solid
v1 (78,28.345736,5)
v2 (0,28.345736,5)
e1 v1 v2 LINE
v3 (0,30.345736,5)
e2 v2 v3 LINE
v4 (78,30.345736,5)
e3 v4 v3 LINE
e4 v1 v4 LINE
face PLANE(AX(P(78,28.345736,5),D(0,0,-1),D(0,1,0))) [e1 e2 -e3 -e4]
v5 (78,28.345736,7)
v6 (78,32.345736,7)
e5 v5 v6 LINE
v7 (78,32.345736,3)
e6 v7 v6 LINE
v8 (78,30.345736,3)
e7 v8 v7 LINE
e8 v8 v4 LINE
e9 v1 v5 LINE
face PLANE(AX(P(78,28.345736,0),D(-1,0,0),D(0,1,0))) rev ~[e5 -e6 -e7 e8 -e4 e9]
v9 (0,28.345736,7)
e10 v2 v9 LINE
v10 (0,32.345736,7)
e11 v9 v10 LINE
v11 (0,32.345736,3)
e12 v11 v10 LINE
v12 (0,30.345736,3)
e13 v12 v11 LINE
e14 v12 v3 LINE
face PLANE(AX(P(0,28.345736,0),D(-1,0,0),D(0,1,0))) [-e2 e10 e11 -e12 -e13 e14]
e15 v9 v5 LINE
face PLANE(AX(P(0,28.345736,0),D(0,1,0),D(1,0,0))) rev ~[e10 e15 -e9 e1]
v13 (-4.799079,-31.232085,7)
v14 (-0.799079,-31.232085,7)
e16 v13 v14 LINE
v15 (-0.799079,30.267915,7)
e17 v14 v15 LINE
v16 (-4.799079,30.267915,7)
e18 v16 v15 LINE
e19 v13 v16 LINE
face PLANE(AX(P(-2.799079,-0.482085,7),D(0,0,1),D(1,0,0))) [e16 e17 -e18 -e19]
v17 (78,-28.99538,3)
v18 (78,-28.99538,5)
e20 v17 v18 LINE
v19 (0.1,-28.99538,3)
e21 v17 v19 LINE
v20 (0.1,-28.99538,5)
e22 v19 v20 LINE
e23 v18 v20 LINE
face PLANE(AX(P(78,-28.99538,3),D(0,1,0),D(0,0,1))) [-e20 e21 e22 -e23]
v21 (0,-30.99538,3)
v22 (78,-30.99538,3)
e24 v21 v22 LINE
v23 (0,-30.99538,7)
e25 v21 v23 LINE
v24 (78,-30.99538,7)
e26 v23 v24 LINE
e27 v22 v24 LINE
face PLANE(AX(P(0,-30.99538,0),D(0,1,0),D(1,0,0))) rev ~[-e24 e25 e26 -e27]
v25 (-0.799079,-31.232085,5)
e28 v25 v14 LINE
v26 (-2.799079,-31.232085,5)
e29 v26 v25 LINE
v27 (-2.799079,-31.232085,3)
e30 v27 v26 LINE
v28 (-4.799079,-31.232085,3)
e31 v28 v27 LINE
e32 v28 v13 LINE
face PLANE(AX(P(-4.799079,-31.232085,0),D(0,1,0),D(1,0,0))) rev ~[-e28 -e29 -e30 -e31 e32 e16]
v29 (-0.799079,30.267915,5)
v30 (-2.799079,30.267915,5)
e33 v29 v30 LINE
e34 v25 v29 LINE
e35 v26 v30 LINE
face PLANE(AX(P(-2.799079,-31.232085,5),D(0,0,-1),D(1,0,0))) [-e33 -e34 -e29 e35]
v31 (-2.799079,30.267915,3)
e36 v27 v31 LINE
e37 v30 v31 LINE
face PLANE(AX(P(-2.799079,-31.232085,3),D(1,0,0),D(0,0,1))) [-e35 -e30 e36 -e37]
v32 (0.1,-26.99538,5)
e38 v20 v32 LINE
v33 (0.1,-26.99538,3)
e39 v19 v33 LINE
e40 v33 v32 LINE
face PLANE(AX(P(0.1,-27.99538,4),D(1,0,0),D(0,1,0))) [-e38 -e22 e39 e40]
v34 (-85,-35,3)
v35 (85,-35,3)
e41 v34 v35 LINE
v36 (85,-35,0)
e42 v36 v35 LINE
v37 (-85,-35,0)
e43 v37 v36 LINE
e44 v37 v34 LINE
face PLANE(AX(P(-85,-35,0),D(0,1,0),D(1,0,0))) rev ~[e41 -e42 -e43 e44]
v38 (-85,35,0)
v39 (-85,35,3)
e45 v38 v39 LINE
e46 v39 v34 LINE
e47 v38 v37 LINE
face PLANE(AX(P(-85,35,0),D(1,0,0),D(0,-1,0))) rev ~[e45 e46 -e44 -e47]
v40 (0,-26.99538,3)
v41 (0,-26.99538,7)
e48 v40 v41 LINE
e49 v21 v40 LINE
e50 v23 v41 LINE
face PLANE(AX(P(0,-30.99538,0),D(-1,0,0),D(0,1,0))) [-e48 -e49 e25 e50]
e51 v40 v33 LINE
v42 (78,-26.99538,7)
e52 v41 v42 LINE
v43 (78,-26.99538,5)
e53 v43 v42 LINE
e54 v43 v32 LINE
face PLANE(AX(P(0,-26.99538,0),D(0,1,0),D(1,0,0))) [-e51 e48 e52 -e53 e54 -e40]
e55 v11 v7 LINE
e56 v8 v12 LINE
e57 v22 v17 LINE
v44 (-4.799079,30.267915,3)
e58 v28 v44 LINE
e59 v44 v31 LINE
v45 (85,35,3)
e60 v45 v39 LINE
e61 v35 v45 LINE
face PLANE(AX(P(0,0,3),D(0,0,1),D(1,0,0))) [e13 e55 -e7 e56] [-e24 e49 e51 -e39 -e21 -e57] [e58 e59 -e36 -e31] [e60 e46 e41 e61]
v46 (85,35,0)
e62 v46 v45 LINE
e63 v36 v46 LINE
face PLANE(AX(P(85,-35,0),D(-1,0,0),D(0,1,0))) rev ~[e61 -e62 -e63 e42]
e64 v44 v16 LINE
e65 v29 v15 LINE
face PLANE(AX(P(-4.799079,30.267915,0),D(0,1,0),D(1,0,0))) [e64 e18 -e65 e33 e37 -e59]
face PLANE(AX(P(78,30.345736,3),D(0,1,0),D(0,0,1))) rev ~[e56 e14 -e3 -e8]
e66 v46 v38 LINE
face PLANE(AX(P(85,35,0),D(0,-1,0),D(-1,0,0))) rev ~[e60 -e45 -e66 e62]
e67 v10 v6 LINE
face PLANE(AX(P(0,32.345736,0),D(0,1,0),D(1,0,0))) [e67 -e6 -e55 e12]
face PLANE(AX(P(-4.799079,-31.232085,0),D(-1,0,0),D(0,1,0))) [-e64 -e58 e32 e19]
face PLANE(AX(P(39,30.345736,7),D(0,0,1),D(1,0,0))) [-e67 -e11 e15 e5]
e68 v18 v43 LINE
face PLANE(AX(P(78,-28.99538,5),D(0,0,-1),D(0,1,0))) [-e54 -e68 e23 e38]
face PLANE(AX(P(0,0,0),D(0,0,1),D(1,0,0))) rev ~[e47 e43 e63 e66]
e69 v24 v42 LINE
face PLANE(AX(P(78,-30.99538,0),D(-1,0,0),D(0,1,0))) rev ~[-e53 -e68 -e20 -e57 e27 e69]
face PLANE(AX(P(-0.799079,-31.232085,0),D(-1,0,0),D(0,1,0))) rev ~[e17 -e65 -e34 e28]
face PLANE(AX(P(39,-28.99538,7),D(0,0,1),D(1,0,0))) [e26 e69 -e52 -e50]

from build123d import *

# Parameters (mm, degrees)
F0_W     = 4
F0_H     = 61.5
F0_W_2   = 78
F0_H_2   = 4
F1_DEPTH = 3
F2_DEPTH = 7
F3_W     = 2
F3_H     = 2
F4_DEPTH = 77.9
F5_W     = 2
F5_H     = 2
F6_DEPTH = 64.1
F7_W     = 2
F7_H     = 2
F8_DEPTH = 78


# Not quite as in the source:
# - a feature names something its author has since deleted; it is built from what else it names


with BuildPart() as f1:
    # F0 (on Top) → F1 (new body)
    with BuildSketch(Plane.XY):
        Polygon((85, 35), (-85, 35), (-85, -25.7047470659), (-85, -35), (-7, -35), (85, -35), align=None)
        with Locations((-2.7990786843, -0.482085079)):
            Rectangle(F0_W, F0_H, mode=Mode.SUBTRACT)
        with Locations((39, -28.9953801334)):
            Rectangle(F0_W_2, F0_H_2, mode=Mode.SUBTRACT)
        with Locations((39, 30.3457357436)):
            Rectangle(F0_W_2, F0_H_2, mode=Mode.SUBTRACT)
    extrude(amount=F1_DEPTH)

    # F0 (on Top) → F2 (join)
    with BuildSketch(Plane.XY):
        with Locations((-2.7990786843, -0.482085079)):
            Rectangle(F0_W, F0_H)
        with Locations((39, -28.9953801334)):
            Rectangle(F0_W_2, F0_H_2)
        with Locations((39, 30.3457357436)):
            Rectangle(F0_W_2, F0_H_2)
    extrude(amount=F2_DEPTH)

    # F3 (on face) → F4 (cut)
    with BuildSketch(Plane.YZ.offset(78)):
        with Locations((-27.9953801334, 4)):
            Rectangle(F3_W, F3_H)
    extrude(amount=-F4_DEPTH, mode=Mode.SUBTRACT)

    # F5 (on face) → F6 (cut)
    with BuildSketch(Plane.XZ.offset(31.232085079)):
        with Locations((-1.7990786843, 4)):
            Rectangle(F5_W, F5_H)
    extrude(amount=-F6_DEPTH, mode=Mode.SUBTRACT)

    # F7 (on face) → F8 (cut)
    with BuildSketch(Plane.YZ.offset(78)):
        with Locations((29.3457357436, 4)):
            Rectangle(F7_W, F7_H)
    extrude(amount=-F8_DEPTH, mode=Mode.SUBTRACT)


solid = f1.part
